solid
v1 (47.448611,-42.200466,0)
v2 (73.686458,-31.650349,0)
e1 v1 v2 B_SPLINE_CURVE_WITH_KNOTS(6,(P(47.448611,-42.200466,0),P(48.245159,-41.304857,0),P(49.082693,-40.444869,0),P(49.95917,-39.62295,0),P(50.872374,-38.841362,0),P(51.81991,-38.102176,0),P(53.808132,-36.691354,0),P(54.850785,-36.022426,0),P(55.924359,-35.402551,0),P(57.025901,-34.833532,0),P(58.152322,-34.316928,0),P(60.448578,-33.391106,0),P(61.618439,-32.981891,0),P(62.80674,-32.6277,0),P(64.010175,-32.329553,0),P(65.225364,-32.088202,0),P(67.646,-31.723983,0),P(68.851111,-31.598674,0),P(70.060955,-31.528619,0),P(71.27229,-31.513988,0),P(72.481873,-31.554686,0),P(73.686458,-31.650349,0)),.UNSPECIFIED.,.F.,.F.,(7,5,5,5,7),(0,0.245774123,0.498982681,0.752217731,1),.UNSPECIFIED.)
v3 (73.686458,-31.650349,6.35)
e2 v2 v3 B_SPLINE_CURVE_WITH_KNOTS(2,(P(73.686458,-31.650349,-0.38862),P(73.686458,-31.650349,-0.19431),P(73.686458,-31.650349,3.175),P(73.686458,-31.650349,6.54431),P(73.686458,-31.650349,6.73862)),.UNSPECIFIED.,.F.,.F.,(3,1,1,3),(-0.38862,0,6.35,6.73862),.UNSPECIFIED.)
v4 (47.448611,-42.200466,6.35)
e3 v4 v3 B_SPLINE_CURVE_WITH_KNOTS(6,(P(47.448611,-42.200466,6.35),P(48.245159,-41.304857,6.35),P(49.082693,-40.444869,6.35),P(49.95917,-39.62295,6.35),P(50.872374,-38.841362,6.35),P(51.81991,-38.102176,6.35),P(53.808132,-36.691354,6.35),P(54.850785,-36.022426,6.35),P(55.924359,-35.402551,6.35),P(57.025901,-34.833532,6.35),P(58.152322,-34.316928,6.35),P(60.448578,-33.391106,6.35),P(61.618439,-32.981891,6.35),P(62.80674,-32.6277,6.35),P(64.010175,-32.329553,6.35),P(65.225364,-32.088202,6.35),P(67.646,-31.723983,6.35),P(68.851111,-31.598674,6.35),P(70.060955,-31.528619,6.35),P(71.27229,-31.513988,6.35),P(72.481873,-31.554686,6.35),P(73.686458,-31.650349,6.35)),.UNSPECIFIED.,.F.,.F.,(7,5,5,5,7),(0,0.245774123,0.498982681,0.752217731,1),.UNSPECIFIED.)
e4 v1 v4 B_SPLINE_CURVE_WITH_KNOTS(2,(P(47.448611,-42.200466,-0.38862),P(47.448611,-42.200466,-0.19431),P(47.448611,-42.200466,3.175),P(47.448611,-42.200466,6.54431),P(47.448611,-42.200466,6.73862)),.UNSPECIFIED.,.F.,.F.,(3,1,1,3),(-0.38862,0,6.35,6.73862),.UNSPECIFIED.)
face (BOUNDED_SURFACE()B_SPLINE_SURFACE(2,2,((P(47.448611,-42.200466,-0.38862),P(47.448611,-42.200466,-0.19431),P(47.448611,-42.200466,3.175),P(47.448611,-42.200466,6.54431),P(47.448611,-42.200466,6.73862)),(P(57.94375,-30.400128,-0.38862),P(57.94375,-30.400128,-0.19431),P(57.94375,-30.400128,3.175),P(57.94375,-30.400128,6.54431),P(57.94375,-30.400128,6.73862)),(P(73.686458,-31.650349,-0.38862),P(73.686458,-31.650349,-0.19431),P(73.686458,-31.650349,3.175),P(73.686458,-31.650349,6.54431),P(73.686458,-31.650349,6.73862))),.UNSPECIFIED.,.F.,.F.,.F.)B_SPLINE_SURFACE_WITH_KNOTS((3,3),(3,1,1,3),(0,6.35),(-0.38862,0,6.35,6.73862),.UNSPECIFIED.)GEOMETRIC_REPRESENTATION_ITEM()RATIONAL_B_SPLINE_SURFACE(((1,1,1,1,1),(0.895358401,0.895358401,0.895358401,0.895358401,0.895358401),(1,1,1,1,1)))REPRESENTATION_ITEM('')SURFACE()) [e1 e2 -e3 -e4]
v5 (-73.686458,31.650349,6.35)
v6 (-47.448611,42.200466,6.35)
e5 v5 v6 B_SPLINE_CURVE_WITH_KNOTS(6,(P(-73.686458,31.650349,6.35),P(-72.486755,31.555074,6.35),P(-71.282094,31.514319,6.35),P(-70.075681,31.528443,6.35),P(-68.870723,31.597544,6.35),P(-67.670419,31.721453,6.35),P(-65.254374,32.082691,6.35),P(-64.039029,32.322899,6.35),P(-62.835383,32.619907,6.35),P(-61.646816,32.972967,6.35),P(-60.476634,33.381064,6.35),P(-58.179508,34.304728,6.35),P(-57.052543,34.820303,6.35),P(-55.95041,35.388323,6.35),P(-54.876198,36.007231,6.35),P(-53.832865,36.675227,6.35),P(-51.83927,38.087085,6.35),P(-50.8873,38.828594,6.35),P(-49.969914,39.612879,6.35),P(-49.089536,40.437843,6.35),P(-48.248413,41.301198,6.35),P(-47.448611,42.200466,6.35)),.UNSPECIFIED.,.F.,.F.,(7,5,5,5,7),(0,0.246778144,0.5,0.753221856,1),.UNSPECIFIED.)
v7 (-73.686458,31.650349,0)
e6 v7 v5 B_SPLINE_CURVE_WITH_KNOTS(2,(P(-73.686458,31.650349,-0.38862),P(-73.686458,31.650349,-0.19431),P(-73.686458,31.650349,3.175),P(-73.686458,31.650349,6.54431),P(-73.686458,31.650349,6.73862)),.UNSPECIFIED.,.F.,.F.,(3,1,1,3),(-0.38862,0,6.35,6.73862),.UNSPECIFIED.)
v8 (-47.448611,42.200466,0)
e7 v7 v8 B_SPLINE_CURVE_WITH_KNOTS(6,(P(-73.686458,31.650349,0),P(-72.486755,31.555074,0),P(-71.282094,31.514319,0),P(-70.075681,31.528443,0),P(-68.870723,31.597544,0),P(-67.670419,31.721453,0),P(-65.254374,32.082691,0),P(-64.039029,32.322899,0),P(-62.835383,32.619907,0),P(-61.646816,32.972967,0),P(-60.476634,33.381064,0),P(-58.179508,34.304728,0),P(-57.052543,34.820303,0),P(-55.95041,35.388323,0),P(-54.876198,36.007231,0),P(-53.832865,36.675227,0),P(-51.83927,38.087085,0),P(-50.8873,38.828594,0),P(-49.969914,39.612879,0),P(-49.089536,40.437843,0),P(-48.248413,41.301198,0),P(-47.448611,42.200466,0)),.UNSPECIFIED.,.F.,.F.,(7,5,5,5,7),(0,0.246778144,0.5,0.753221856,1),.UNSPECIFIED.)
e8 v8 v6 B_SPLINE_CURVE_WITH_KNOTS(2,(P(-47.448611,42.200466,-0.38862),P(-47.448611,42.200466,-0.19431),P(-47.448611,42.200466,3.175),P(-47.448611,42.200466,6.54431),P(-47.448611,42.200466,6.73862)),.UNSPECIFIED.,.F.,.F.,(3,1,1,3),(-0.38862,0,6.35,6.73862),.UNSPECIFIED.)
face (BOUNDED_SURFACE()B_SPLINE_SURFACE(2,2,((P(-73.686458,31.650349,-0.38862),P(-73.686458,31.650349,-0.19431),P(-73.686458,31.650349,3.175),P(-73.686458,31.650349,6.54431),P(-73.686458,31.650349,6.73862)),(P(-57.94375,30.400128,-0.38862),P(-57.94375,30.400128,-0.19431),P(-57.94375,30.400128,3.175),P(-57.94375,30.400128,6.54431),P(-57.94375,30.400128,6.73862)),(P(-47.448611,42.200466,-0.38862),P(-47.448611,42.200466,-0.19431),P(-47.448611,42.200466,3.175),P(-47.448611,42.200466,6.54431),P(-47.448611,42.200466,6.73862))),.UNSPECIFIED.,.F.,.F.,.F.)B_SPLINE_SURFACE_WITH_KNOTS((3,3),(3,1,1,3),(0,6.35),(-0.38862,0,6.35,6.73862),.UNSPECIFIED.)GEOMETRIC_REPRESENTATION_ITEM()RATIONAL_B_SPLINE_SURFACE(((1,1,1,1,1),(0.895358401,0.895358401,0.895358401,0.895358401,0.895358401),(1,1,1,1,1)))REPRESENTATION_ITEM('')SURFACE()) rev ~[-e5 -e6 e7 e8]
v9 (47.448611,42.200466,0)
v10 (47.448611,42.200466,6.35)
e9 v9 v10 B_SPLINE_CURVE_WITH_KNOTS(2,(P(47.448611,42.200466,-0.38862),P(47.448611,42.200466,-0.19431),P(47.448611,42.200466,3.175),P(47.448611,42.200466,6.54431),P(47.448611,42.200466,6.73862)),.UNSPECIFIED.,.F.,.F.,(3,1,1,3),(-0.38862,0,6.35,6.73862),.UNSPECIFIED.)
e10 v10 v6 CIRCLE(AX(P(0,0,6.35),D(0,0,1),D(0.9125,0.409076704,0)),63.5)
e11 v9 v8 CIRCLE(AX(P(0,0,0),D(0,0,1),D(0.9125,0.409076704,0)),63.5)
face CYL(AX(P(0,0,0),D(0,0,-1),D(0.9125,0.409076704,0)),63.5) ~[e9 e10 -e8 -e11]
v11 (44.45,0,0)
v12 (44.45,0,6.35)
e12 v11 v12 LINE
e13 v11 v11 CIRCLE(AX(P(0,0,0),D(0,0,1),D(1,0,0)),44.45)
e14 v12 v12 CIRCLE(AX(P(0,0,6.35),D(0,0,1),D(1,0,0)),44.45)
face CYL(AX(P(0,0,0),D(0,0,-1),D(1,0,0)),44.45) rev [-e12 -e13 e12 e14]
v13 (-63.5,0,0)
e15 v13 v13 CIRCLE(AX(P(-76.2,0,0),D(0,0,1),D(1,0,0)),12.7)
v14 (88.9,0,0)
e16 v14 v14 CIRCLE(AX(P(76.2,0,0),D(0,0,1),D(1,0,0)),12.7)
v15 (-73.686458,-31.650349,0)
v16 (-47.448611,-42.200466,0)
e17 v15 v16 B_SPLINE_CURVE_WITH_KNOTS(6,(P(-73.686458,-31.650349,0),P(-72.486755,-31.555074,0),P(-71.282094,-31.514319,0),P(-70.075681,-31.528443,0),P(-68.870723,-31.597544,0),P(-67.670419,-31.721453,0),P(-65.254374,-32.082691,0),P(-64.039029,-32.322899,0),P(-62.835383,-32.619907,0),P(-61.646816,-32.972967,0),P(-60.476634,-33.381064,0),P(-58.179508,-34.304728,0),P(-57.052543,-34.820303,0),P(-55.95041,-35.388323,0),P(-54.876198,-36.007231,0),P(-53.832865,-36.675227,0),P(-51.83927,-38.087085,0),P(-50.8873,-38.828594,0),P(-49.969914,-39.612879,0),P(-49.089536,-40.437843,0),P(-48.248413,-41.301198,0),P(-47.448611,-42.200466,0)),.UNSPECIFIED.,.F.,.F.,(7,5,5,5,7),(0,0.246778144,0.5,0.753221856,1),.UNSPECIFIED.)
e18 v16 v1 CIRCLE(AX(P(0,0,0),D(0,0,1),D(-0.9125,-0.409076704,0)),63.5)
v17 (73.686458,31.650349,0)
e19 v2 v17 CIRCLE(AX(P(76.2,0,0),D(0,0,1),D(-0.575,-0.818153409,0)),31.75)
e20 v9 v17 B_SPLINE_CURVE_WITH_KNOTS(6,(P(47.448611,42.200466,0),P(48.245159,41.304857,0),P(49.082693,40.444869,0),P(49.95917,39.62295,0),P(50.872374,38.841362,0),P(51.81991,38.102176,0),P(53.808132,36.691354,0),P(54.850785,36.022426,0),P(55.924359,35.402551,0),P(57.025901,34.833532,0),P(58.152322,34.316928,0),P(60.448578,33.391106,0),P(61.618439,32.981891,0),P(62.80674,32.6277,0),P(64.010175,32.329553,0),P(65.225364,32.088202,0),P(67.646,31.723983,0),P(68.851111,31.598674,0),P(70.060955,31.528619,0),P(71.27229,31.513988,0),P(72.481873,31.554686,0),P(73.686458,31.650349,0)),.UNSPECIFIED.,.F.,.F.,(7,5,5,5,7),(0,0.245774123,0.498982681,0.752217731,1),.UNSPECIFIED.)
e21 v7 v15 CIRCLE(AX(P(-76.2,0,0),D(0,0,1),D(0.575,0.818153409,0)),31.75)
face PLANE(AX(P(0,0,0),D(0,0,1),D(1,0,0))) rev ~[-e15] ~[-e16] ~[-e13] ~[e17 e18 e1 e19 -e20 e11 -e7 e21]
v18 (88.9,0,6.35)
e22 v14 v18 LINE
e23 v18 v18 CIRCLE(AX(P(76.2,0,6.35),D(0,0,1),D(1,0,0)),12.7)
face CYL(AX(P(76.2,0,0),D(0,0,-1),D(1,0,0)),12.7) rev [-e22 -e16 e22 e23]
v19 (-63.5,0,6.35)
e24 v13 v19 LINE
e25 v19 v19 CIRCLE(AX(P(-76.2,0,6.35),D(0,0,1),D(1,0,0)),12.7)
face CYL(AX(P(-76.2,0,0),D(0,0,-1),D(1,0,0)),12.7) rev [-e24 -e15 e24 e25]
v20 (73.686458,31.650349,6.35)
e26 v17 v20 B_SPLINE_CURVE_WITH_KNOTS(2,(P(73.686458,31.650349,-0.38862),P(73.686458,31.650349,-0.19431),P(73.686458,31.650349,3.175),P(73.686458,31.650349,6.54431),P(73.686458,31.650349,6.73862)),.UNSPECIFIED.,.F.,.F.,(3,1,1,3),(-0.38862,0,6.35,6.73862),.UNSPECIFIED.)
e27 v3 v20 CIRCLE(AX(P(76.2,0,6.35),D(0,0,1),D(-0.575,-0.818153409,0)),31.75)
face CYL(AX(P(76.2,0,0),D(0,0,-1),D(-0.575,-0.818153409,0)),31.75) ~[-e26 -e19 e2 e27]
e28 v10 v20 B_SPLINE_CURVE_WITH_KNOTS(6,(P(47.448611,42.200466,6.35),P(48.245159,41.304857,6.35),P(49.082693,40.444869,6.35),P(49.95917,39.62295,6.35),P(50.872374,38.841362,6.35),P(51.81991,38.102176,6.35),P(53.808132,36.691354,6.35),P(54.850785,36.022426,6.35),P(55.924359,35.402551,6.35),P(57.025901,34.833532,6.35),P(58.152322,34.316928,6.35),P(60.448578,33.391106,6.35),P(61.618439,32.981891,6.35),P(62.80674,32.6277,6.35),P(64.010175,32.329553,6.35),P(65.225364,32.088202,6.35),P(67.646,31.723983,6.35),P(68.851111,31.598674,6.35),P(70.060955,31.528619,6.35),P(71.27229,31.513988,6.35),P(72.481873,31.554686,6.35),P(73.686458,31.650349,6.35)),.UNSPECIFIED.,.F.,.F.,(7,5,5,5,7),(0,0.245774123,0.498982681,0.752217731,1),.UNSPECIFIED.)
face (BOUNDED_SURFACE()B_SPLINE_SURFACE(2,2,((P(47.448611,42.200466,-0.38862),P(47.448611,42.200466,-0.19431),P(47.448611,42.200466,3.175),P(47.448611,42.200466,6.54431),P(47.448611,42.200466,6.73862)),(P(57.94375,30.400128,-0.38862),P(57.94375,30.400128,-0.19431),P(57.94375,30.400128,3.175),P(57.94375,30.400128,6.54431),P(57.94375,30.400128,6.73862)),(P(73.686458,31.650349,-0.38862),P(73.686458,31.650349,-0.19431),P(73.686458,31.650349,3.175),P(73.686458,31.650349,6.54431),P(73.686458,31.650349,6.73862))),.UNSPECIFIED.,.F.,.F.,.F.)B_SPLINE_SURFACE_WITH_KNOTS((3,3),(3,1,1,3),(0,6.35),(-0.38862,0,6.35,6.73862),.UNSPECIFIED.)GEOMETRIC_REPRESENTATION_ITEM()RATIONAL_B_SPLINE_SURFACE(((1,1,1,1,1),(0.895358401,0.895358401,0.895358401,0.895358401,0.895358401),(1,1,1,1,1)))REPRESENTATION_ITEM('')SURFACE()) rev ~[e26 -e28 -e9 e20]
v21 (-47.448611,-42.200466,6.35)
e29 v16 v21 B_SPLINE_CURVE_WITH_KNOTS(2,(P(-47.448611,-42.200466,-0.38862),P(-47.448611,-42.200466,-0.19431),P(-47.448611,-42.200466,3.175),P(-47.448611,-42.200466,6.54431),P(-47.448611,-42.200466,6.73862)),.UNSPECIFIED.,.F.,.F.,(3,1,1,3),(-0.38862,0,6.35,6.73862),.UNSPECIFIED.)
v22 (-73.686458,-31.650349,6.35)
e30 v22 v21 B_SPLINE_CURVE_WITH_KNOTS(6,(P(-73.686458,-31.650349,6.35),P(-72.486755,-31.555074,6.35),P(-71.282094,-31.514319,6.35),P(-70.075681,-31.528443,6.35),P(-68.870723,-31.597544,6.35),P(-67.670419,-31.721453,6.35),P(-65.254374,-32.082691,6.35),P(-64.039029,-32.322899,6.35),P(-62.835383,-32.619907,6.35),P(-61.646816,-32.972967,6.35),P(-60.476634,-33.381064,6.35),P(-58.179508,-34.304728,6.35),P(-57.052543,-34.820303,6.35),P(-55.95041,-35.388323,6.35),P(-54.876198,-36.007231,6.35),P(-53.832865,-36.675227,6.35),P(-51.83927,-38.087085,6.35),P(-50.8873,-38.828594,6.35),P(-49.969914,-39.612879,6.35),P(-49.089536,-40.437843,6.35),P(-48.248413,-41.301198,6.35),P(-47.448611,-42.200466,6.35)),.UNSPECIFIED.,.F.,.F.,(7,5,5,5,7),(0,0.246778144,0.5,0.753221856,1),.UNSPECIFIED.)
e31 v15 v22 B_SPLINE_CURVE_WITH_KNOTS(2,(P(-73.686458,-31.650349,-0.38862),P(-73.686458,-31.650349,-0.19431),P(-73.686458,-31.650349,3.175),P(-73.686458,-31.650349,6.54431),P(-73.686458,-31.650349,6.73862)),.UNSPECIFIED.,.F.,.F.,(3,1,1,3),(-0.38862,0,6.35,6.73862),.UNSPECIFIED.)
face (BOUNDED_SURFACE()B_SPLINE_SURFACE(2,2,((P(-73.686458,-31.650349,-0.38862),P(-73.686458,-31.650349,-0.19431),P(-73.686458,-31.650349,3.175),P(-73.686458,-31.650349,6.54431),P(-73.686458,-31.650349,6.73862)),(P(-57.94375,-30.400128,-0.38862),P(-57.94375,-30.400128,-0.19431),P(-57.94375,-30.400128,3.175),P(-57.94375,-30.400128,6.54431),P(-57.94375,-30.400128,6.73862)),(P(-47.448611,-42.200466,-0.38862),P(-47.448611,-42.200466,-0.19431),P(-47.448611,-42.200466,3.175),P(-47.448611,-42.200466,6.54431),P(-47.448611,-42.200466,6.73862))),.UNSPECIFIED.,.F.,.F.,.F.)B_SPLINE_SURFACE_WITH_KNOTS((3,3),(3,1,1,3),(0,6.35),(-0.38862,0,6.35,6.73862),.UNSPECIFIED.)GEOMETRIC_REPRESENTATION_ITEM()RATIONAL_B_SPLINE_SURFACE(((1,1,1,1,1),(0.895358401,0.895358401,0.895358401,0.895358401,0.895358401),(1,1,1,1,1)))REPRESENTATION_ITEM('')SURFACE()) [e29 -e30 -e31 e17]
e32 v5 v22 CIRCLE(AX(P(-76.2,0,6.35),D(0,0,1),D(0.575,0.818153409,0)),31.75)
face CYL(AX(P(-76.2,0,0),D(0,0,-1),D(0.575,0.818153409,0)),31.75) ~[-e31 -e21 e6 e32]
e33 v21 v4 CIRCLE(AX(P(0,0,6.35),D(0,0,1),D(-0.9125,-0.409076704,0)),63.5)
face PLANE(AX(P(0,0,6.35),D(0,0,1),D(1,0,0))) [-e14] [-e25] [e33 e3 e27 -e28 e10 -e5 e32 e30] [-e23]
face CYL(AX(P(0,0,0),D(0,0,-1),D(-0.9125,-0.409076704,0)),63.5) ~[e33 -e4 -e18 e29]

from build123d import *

# Parameters (mm, degrees)
F0_R     = 12.7
F0_R_2   = 44.45
F1_DEPTH = 6.35
F2_R     = 31.75


# Not quite as in the source:
# - a feature names something its author has since deleted; it is built from what else it names


with BuildPart() as f1:
    # F0 (on Top) → F1 (new body)
    with BuildSketch(Plane.XY):
        with BuildLine():
            ThreePointArc((-57.94375, 25.976370723), (-107.95, 0), (-57.94375, -25.976370723))
            ThreePointArc((-57.94375, -25.976370723), (0, -63.5), (57.94375, -25.976370723))
            ThreePointArc((57.94375, -25.976370723), (107.95, 0), (57.94375, 25.976370723))
            ThreePointArc((57.94375, 25.976370723), (0, 63.5), (-57.94375, 25.976370723))
        make_face()
        with Locations((-76.2, 0)):
            Circle(F0_R, mode=Mode.SUBTRACT)
        Circle(F0_R_2, mode=Mode.SUBTRACT)
        with Locations((76.2, 0)):
            Circle(F0_R, mode=Mode.SUBTRACT)
    extrude(amount=F1_DEPTH)

    # F2
    f2_edges = [f1.edges().sort_by_distance(p)[0] for p in [
        (-57.94375, -25.976371, 3.175),
        (57.94375, -25.976371, 3.175),
        (-57.94375, 25.976371, 3.175),
        (57.94375, 25.976371, 3.175),
    ]]
    fillet(f2_edges, radius=F2_R)


solid = f1.part
